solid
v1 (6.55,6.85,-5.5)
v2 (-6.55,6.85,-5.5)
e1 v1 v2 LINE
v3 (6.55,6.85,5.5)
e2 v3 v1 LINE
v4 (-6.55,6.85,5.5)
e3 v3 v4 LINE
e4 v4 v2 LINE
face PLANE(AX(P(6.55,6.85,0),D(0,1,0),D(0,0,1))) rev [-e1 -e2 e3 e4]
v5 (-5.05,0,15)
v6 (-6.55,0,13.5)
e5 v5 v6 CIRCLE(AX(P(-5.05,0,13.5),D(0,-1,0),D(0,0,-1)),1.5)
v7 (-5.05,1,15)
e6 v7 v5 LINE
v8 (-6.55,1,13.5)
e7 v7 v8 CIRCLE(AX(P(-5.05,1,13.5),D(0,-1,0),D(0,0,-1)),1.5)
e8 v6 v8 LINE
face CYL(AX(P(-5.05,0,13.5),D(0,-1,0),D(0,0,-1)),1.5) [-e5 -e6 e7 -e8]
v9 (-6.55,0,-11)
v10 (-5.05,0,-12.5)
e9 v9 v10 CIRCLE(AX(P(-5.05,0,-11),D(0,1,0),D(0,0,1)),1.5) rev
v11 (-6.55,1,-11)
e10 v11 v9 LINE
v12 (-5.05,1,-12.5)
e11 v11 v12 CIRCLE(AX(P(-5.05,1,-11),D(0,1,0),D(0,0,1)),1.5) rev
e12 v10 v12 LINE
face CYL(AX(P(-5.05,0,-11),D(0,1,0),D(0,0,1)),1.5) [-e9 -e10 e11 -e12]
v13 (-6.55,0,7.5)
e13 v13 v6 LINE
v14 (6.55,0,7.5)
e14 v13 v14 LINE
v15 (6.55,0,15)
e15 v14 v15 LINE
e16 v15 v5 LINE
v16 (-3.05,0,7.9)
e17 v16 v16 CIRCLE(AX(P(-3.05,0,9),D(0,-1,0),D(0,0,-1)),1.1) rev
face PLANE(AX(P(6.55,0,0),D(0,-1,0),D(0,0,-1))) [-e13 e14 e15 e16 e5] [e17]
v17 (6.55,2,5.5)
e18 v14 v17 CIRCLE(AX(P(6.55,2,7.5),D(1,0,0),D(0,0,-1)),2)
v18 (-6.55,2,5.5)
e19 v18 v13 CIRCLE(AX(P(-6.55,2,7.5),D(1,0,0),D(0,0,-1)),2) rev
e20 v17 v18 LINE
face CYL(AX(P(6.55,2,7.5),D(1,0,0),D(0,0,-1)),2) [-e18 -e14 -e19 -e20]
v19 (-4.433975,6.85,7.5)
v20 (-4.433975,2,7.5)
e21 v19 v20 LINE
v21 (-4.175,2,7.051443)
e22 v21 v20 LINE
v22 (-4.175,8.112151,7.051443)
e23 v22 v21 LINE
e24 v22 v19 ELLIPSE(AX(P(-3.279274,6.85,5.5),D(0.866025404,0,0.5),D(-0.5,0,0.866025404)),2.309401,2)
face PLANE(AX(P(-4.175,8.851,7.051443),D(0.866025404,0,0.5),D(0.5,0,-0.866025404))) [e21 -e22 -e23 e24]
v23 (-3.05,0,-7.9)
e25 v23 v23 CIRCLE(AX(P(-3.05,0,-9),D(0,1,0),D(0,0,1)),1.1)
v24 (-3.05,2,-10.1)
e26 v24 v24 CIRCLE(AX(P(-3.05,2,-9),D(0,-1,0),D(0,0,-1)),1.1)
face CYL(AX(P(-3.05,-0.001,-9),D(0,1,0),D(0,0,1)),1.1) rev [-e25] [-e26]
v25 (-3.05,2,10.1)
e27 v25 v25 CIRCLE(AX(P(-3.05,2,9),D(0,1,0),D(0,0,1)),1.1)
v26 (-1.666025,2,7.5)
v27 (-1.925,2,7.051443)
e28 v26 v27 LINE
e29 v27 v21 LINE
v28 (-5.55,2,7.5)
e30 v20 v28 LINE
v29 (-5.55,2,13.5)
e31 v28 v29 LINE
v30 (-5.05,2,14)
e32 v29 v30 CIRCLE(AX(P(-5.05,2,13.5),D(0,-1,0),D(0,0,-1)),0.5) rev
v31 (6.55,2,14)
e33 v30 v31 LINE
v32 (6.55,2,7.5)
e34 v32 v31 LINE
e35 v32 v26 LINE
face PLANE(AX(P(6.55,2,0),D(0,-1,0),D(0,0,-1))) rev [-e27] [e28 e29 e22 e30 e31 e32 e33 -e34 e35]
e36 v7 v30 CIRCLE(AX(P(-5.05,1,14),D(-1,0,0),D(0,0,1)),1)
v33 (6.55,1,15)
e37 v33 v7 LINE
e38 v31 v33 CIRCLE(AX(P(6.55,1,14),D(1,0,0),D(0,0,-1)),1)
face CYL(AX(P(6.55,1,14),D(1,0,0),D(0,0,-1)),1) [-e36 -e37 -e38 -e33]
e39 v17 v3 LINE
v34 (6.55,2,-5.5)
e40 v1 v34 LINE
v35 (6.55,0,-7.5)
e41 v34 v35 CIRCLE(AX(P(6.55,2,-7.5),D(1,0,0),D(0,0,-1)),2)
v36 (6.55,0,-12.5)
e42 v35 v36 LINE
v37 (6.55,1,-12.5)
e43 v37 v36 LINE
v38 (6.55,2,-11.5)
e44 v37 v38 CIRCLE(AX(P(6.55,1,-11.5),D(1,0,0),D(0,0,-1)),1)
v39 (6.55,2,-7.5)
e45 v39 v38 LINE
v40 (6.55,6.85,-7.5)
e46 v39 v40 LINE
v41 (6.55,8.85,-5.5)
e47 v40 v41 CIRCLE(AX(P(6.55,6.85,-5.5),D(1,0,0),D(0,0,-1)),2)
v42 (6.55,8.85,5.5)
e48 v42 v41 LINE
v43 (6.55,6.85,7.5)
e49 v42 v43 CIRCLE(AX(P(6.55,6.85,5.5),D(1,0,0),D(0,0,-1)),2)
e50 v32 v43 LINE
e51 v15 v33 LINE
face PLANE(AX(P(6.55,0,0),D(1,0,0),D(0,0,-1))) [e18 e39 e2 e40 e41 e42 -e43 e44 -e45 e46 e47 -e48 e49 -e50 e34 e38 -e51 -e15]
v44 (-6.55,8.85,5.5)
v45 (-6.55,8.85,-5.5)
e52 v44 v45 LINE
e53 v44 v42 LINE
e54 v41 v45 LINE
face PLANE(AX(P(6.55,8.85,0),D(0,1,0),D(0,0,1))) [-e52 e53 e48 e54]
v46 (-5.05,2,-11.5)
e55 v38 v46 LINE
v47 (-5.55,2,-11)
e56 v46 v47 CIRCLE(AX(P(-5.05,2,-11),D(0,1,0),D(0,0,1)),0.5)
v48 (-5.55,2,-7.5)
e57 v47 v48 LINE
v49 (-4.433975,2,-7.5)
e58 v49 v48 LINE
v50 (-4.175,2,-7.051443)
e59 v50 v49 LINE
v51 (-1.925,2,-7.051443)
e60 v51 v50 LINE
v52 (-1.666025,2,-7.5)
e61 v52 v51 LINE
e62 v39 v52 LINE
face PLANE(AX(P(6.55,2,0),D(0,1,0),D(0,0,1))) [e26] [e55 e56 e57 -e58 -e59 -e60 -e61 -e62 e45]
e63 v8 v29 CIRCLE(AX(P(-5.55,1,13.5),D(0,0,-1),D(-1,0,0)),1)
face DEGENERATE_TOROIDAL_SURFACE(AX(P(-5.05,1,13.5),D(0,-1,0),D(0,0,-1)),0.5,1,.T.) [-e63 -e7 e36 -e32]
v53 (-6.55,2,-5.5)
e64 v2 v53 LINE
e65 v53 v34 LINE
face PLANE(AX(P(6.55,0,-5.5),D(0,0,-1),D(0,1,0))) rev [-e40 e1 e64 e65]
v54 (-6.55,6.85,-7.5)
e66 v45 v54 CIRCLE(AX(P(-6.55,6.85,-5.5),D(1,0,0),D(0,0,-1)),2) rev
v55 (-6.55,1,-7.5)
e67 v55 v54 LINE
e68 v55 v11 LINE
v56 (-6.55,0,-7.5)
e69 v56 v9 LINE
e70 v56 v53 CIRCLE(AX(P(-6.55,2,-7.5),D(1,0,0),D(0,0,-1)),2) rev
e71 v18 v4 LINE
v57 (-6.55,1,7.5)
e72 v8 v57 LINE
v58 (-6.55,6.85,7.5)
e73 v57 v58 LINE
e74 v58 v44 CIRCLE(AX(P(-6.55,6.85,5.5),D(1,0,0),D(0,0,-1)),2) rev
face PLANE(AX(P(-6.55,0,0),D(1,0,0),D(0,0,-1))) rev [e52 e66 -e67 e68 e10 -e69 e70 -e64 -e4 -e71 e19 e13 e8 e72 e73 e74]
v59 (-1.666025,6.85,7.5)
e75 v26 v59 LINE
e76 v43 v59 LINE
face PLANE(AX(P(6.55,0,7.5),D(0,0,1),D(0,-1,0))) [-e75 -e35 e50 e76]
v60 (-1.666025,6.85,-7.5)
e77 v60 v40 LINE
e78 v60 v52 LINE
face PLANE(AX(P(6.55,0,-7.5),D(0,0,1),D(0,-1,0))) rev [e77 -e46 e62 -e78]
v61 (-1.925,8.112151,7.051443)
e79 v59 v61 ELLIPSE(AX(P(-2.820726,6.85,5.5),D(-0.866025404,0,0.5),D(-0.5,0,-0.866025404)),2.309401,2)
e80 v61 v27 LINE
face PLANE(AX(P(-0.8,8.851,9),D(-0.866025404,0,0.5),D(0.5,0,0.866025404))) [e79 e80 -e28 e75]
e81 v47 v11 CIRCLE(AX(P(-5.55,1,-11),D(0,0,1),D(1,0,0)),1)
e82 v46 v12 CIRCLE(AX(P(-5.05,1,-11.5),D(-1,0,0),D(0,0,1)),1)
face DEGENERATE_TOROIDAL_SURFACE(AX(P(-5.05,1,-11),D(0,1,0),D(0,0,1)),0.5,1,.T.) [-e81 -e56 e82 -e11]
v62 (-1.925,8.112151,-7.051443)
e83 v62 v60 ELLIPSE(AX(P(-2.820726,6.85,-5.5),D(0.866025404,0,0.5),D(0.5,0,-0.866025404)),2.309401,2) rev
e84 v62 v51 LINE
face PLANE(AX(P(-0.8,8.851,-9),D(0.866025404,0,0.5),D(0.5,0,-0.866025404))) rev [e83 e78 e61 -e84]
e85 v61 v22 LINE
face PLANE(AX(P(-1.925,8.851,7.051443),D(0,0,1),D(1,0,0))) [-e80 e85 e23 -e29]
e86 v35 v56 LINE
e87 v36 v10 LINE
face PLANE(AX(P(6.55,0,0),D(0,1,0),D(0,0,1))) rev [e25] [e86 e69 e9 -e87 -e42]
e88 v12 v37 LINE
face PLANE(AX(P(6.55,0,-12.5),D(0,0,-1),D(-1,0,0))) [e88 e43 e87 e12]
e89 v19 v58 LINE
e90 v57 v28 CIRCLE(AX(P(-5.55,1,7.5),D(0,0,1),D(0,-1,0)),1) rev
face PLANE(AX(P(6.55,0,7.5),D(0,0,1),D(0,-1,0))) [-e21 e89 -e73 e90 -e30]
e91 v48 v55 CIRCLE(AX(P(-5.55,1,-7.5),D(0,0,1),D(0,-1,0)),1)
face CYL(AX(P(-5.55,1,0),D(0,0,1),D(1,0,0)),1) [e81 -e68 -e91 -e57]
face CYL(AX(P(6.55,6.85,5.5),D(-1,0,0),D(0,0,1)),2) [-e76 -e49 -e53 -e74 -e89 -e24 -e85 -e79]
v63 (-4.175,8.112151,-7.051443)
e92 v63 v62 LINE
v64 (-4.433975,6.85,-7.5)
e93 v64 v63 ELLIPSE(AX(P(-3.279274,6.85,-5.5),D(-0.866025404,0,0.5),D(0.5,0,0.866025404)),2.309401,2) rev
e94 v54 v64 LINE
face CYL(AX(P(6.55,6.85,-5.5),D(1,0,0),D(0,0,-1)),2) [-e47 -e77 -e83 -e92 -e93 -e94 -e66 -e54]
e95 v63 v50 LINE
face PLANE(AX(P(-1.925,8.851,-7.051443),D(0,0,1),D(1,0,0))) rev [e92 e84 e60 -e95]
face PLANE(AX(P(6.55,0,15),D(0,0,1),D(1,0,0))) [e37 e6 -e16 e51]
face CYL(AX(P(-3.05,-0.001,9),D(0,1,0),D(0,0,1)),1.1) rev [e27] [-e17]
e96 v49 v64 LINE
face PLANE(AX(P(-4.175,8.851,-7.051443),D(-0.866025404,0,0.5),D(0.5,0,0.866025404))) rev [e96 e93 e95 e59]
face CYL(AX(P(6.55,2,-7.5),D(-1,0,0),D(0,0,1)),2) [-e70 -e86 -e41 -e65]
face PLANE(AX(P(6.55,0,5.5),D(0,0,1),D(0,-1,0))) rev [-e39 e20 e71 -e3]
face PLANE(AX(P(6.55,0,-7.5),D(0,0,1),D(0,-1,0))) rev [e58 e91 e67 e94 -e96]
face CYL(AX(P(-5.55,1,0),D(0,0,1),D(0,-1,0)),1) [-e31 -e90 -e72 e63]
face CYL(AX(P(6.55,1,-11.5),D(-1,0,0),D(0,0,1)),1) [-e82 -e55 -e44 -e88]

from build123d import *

# Parameters (mm, degrees)
BOSS_EXTRUDE1_DEPTH = 6.55
CUT_EXTRUDE1_REACH  = 19.743
SKETCH2_R           = 1.1
CUT_EXTRUDE2_REACH  = 19.743
FILLET1_R           = 2
FILLET3_R           = 1.5
FILLET4_R           = 1


with BuildPart() as part:
    # Sketch1 → Boss-Extrude1 (new, symmetric)
    with BuildSketch(Plane(origin=(0, 0, 0), x_dir=(0, 0, -1), z_dir=(1, 0, 0))):
        Polygon((-5.5, 6.85), (5.5, 6.85), (5.5, 0), (12.5, 0), (12.5, 2), (7.5, 2), (7.5, 8.85), (-7.5, 8.85), (-7.5, 2), (-15, 2), (-15, 0), (-5.5, 0), align=None)
    extrude(amount=BOSS_EXTRUDE1_DEPTH, both=True)

    # Sketch2 → Cut-Extrude1 (cut, up to next)
    with BuildSketch(Plane(origin=(0, 2, 0), x_dir=(1, 0, 0), z_dir=(0, 1, 0)), mode=Mode.PRIVATE) as cut_extrude1_sk1:
        with Locations(Location((-3.05, -9, 0), (0, 0, 270))):
            Circle(SKETCH2_R)
    cut_extrude1_tool1 = extrude(cut_extrude1_sk1.sketch, amount=-CUT_EXTRUDE1_REACH, mode=Mode.PRIVATE) & part.part
    cut_extrude1 = cut_extrude1_tool1.solids().sort_by_distance((-3.05, 2, 9))[0]
    add(cut_extrude1, mode=Mode.SUBTRACT)

    # Sketch3 → Cut-Extrude2 (cut, up to next)
    with BuildSketch(Plane(origin=(0, 2, 0), x_dir=(1, 0, 0), z_dir=(0, 1, 0)), mode=Mode.PRIVATE) as cut_extrude2_sk1:
        Polygon((-5.3, -9), (-4.175, -10.948557159), (-1.925, -10.948557159), (-0.8, -9), (-1.925, -7.051442841), (-4.175, -7.051442841), align=None)
    cut_extrude2_tool1 = extrude(cut_extrude2_sk1.sketch, amount=CUT_EXTRUDE2_REACH, mode=Mode.PRIVATE) & part.part
    cut_extrude2 = cut_extrude2_tool1.solids().sort_by_distance((-3.05, 2, 9))[0]
    add(cut_extrude2, mode=Mode.SUBTRACT)

    # Mirror1: Cut-Extrude1, Cut-Extrude2 across plane
    add(cut_extrude1.mirror(Plane.XY), mode=Mode.SUBTRACT)
    add(cut_extrude2.mirror(Plane.XY), mode=Mode.SUBTRACT)

    # Fillet1
    # the kernel refuses this fillet: 2 mm, written as the material it takes off along each edge
    with BuildSketch(Plane(origin=(-11.55, 0, -5.5), x_dir=(0, 1, 0), z_dir=(1, 0, 0)), Plane(origin=(11.55, 0, 5.5), x_dir=(0, 1, 0), z_dir=(-1, 0, 0))) as fillet1_piece_1:
        with BuildLine():
            CenterArc((FILLET1_R, -FILLET1_R), FILLET1_R, 90, 90)
            Line((0, -FILLET1_R), (0, 0))
            Line((0, 0), (FILLET1_R, 0))
        make_face()
    extrude(amount=23.1, mode=Mode.SUBTRACT)
    with BuildSketch(Plane(origin=(-6.666025404, 8.85, 7.5), x_dir=(0, 0, -1), z_dir=(1, 0, 0))) as fillet1_piece_2:
        with BuildLine():
            CenterArc((FILLET1_R, -FILLET1_R), FILLET1_R, 90, 90)
            Line((0, -FILLET1_R), (0, 0))
            Line((0, 0), (FILLET1_R, 0))
        make_face()
    extrude(amount=18.216025404, mode=Mode.SUBTRACT)
    with BuildSketch(Plane(origin=(-6.666025404, 8.85, -7.5), x_dir=(0, 0, 1), z_dir=(1, 0, 0))) as fillet1_piece_3:
        with BuildLine():
            CenterArc((FILLET1_R, FILLET1_R), FILLET1_R, 180, 90)
            Line((0, FILLET1_R), (0, 0))
            Line((0, 0), (FILLET1_R, 0))
        make_face()
    extrude(amount=18.216025404, mode=Mode.SUBTRACT)

    # Fillet3
    fillet3_edges = [part.edges().sort_by_distance(p)[0] for p in [
        (-6.55, 1, -12.5),
        (-6.55, 1, 15),
    ]]
    fillet(fillet3_edges, radius=FILLET3_R)

    # Fillet4
    fillet4_edges = [part.edges().sort_by_distance(p)[0] for p in [
        (-6.110660172, 2, 14.560660172),
        (-6.110660172, 2, -12.060660172),
        (-6.55, 2, 10.5),
        (-6.55, 2, -9.25),
        (0.75, 2, -12.5),
        (0.75, 2, 15),
    ]]
    fillet(fillet4_edges, radius=FILLET4_R)


solid = part.part
